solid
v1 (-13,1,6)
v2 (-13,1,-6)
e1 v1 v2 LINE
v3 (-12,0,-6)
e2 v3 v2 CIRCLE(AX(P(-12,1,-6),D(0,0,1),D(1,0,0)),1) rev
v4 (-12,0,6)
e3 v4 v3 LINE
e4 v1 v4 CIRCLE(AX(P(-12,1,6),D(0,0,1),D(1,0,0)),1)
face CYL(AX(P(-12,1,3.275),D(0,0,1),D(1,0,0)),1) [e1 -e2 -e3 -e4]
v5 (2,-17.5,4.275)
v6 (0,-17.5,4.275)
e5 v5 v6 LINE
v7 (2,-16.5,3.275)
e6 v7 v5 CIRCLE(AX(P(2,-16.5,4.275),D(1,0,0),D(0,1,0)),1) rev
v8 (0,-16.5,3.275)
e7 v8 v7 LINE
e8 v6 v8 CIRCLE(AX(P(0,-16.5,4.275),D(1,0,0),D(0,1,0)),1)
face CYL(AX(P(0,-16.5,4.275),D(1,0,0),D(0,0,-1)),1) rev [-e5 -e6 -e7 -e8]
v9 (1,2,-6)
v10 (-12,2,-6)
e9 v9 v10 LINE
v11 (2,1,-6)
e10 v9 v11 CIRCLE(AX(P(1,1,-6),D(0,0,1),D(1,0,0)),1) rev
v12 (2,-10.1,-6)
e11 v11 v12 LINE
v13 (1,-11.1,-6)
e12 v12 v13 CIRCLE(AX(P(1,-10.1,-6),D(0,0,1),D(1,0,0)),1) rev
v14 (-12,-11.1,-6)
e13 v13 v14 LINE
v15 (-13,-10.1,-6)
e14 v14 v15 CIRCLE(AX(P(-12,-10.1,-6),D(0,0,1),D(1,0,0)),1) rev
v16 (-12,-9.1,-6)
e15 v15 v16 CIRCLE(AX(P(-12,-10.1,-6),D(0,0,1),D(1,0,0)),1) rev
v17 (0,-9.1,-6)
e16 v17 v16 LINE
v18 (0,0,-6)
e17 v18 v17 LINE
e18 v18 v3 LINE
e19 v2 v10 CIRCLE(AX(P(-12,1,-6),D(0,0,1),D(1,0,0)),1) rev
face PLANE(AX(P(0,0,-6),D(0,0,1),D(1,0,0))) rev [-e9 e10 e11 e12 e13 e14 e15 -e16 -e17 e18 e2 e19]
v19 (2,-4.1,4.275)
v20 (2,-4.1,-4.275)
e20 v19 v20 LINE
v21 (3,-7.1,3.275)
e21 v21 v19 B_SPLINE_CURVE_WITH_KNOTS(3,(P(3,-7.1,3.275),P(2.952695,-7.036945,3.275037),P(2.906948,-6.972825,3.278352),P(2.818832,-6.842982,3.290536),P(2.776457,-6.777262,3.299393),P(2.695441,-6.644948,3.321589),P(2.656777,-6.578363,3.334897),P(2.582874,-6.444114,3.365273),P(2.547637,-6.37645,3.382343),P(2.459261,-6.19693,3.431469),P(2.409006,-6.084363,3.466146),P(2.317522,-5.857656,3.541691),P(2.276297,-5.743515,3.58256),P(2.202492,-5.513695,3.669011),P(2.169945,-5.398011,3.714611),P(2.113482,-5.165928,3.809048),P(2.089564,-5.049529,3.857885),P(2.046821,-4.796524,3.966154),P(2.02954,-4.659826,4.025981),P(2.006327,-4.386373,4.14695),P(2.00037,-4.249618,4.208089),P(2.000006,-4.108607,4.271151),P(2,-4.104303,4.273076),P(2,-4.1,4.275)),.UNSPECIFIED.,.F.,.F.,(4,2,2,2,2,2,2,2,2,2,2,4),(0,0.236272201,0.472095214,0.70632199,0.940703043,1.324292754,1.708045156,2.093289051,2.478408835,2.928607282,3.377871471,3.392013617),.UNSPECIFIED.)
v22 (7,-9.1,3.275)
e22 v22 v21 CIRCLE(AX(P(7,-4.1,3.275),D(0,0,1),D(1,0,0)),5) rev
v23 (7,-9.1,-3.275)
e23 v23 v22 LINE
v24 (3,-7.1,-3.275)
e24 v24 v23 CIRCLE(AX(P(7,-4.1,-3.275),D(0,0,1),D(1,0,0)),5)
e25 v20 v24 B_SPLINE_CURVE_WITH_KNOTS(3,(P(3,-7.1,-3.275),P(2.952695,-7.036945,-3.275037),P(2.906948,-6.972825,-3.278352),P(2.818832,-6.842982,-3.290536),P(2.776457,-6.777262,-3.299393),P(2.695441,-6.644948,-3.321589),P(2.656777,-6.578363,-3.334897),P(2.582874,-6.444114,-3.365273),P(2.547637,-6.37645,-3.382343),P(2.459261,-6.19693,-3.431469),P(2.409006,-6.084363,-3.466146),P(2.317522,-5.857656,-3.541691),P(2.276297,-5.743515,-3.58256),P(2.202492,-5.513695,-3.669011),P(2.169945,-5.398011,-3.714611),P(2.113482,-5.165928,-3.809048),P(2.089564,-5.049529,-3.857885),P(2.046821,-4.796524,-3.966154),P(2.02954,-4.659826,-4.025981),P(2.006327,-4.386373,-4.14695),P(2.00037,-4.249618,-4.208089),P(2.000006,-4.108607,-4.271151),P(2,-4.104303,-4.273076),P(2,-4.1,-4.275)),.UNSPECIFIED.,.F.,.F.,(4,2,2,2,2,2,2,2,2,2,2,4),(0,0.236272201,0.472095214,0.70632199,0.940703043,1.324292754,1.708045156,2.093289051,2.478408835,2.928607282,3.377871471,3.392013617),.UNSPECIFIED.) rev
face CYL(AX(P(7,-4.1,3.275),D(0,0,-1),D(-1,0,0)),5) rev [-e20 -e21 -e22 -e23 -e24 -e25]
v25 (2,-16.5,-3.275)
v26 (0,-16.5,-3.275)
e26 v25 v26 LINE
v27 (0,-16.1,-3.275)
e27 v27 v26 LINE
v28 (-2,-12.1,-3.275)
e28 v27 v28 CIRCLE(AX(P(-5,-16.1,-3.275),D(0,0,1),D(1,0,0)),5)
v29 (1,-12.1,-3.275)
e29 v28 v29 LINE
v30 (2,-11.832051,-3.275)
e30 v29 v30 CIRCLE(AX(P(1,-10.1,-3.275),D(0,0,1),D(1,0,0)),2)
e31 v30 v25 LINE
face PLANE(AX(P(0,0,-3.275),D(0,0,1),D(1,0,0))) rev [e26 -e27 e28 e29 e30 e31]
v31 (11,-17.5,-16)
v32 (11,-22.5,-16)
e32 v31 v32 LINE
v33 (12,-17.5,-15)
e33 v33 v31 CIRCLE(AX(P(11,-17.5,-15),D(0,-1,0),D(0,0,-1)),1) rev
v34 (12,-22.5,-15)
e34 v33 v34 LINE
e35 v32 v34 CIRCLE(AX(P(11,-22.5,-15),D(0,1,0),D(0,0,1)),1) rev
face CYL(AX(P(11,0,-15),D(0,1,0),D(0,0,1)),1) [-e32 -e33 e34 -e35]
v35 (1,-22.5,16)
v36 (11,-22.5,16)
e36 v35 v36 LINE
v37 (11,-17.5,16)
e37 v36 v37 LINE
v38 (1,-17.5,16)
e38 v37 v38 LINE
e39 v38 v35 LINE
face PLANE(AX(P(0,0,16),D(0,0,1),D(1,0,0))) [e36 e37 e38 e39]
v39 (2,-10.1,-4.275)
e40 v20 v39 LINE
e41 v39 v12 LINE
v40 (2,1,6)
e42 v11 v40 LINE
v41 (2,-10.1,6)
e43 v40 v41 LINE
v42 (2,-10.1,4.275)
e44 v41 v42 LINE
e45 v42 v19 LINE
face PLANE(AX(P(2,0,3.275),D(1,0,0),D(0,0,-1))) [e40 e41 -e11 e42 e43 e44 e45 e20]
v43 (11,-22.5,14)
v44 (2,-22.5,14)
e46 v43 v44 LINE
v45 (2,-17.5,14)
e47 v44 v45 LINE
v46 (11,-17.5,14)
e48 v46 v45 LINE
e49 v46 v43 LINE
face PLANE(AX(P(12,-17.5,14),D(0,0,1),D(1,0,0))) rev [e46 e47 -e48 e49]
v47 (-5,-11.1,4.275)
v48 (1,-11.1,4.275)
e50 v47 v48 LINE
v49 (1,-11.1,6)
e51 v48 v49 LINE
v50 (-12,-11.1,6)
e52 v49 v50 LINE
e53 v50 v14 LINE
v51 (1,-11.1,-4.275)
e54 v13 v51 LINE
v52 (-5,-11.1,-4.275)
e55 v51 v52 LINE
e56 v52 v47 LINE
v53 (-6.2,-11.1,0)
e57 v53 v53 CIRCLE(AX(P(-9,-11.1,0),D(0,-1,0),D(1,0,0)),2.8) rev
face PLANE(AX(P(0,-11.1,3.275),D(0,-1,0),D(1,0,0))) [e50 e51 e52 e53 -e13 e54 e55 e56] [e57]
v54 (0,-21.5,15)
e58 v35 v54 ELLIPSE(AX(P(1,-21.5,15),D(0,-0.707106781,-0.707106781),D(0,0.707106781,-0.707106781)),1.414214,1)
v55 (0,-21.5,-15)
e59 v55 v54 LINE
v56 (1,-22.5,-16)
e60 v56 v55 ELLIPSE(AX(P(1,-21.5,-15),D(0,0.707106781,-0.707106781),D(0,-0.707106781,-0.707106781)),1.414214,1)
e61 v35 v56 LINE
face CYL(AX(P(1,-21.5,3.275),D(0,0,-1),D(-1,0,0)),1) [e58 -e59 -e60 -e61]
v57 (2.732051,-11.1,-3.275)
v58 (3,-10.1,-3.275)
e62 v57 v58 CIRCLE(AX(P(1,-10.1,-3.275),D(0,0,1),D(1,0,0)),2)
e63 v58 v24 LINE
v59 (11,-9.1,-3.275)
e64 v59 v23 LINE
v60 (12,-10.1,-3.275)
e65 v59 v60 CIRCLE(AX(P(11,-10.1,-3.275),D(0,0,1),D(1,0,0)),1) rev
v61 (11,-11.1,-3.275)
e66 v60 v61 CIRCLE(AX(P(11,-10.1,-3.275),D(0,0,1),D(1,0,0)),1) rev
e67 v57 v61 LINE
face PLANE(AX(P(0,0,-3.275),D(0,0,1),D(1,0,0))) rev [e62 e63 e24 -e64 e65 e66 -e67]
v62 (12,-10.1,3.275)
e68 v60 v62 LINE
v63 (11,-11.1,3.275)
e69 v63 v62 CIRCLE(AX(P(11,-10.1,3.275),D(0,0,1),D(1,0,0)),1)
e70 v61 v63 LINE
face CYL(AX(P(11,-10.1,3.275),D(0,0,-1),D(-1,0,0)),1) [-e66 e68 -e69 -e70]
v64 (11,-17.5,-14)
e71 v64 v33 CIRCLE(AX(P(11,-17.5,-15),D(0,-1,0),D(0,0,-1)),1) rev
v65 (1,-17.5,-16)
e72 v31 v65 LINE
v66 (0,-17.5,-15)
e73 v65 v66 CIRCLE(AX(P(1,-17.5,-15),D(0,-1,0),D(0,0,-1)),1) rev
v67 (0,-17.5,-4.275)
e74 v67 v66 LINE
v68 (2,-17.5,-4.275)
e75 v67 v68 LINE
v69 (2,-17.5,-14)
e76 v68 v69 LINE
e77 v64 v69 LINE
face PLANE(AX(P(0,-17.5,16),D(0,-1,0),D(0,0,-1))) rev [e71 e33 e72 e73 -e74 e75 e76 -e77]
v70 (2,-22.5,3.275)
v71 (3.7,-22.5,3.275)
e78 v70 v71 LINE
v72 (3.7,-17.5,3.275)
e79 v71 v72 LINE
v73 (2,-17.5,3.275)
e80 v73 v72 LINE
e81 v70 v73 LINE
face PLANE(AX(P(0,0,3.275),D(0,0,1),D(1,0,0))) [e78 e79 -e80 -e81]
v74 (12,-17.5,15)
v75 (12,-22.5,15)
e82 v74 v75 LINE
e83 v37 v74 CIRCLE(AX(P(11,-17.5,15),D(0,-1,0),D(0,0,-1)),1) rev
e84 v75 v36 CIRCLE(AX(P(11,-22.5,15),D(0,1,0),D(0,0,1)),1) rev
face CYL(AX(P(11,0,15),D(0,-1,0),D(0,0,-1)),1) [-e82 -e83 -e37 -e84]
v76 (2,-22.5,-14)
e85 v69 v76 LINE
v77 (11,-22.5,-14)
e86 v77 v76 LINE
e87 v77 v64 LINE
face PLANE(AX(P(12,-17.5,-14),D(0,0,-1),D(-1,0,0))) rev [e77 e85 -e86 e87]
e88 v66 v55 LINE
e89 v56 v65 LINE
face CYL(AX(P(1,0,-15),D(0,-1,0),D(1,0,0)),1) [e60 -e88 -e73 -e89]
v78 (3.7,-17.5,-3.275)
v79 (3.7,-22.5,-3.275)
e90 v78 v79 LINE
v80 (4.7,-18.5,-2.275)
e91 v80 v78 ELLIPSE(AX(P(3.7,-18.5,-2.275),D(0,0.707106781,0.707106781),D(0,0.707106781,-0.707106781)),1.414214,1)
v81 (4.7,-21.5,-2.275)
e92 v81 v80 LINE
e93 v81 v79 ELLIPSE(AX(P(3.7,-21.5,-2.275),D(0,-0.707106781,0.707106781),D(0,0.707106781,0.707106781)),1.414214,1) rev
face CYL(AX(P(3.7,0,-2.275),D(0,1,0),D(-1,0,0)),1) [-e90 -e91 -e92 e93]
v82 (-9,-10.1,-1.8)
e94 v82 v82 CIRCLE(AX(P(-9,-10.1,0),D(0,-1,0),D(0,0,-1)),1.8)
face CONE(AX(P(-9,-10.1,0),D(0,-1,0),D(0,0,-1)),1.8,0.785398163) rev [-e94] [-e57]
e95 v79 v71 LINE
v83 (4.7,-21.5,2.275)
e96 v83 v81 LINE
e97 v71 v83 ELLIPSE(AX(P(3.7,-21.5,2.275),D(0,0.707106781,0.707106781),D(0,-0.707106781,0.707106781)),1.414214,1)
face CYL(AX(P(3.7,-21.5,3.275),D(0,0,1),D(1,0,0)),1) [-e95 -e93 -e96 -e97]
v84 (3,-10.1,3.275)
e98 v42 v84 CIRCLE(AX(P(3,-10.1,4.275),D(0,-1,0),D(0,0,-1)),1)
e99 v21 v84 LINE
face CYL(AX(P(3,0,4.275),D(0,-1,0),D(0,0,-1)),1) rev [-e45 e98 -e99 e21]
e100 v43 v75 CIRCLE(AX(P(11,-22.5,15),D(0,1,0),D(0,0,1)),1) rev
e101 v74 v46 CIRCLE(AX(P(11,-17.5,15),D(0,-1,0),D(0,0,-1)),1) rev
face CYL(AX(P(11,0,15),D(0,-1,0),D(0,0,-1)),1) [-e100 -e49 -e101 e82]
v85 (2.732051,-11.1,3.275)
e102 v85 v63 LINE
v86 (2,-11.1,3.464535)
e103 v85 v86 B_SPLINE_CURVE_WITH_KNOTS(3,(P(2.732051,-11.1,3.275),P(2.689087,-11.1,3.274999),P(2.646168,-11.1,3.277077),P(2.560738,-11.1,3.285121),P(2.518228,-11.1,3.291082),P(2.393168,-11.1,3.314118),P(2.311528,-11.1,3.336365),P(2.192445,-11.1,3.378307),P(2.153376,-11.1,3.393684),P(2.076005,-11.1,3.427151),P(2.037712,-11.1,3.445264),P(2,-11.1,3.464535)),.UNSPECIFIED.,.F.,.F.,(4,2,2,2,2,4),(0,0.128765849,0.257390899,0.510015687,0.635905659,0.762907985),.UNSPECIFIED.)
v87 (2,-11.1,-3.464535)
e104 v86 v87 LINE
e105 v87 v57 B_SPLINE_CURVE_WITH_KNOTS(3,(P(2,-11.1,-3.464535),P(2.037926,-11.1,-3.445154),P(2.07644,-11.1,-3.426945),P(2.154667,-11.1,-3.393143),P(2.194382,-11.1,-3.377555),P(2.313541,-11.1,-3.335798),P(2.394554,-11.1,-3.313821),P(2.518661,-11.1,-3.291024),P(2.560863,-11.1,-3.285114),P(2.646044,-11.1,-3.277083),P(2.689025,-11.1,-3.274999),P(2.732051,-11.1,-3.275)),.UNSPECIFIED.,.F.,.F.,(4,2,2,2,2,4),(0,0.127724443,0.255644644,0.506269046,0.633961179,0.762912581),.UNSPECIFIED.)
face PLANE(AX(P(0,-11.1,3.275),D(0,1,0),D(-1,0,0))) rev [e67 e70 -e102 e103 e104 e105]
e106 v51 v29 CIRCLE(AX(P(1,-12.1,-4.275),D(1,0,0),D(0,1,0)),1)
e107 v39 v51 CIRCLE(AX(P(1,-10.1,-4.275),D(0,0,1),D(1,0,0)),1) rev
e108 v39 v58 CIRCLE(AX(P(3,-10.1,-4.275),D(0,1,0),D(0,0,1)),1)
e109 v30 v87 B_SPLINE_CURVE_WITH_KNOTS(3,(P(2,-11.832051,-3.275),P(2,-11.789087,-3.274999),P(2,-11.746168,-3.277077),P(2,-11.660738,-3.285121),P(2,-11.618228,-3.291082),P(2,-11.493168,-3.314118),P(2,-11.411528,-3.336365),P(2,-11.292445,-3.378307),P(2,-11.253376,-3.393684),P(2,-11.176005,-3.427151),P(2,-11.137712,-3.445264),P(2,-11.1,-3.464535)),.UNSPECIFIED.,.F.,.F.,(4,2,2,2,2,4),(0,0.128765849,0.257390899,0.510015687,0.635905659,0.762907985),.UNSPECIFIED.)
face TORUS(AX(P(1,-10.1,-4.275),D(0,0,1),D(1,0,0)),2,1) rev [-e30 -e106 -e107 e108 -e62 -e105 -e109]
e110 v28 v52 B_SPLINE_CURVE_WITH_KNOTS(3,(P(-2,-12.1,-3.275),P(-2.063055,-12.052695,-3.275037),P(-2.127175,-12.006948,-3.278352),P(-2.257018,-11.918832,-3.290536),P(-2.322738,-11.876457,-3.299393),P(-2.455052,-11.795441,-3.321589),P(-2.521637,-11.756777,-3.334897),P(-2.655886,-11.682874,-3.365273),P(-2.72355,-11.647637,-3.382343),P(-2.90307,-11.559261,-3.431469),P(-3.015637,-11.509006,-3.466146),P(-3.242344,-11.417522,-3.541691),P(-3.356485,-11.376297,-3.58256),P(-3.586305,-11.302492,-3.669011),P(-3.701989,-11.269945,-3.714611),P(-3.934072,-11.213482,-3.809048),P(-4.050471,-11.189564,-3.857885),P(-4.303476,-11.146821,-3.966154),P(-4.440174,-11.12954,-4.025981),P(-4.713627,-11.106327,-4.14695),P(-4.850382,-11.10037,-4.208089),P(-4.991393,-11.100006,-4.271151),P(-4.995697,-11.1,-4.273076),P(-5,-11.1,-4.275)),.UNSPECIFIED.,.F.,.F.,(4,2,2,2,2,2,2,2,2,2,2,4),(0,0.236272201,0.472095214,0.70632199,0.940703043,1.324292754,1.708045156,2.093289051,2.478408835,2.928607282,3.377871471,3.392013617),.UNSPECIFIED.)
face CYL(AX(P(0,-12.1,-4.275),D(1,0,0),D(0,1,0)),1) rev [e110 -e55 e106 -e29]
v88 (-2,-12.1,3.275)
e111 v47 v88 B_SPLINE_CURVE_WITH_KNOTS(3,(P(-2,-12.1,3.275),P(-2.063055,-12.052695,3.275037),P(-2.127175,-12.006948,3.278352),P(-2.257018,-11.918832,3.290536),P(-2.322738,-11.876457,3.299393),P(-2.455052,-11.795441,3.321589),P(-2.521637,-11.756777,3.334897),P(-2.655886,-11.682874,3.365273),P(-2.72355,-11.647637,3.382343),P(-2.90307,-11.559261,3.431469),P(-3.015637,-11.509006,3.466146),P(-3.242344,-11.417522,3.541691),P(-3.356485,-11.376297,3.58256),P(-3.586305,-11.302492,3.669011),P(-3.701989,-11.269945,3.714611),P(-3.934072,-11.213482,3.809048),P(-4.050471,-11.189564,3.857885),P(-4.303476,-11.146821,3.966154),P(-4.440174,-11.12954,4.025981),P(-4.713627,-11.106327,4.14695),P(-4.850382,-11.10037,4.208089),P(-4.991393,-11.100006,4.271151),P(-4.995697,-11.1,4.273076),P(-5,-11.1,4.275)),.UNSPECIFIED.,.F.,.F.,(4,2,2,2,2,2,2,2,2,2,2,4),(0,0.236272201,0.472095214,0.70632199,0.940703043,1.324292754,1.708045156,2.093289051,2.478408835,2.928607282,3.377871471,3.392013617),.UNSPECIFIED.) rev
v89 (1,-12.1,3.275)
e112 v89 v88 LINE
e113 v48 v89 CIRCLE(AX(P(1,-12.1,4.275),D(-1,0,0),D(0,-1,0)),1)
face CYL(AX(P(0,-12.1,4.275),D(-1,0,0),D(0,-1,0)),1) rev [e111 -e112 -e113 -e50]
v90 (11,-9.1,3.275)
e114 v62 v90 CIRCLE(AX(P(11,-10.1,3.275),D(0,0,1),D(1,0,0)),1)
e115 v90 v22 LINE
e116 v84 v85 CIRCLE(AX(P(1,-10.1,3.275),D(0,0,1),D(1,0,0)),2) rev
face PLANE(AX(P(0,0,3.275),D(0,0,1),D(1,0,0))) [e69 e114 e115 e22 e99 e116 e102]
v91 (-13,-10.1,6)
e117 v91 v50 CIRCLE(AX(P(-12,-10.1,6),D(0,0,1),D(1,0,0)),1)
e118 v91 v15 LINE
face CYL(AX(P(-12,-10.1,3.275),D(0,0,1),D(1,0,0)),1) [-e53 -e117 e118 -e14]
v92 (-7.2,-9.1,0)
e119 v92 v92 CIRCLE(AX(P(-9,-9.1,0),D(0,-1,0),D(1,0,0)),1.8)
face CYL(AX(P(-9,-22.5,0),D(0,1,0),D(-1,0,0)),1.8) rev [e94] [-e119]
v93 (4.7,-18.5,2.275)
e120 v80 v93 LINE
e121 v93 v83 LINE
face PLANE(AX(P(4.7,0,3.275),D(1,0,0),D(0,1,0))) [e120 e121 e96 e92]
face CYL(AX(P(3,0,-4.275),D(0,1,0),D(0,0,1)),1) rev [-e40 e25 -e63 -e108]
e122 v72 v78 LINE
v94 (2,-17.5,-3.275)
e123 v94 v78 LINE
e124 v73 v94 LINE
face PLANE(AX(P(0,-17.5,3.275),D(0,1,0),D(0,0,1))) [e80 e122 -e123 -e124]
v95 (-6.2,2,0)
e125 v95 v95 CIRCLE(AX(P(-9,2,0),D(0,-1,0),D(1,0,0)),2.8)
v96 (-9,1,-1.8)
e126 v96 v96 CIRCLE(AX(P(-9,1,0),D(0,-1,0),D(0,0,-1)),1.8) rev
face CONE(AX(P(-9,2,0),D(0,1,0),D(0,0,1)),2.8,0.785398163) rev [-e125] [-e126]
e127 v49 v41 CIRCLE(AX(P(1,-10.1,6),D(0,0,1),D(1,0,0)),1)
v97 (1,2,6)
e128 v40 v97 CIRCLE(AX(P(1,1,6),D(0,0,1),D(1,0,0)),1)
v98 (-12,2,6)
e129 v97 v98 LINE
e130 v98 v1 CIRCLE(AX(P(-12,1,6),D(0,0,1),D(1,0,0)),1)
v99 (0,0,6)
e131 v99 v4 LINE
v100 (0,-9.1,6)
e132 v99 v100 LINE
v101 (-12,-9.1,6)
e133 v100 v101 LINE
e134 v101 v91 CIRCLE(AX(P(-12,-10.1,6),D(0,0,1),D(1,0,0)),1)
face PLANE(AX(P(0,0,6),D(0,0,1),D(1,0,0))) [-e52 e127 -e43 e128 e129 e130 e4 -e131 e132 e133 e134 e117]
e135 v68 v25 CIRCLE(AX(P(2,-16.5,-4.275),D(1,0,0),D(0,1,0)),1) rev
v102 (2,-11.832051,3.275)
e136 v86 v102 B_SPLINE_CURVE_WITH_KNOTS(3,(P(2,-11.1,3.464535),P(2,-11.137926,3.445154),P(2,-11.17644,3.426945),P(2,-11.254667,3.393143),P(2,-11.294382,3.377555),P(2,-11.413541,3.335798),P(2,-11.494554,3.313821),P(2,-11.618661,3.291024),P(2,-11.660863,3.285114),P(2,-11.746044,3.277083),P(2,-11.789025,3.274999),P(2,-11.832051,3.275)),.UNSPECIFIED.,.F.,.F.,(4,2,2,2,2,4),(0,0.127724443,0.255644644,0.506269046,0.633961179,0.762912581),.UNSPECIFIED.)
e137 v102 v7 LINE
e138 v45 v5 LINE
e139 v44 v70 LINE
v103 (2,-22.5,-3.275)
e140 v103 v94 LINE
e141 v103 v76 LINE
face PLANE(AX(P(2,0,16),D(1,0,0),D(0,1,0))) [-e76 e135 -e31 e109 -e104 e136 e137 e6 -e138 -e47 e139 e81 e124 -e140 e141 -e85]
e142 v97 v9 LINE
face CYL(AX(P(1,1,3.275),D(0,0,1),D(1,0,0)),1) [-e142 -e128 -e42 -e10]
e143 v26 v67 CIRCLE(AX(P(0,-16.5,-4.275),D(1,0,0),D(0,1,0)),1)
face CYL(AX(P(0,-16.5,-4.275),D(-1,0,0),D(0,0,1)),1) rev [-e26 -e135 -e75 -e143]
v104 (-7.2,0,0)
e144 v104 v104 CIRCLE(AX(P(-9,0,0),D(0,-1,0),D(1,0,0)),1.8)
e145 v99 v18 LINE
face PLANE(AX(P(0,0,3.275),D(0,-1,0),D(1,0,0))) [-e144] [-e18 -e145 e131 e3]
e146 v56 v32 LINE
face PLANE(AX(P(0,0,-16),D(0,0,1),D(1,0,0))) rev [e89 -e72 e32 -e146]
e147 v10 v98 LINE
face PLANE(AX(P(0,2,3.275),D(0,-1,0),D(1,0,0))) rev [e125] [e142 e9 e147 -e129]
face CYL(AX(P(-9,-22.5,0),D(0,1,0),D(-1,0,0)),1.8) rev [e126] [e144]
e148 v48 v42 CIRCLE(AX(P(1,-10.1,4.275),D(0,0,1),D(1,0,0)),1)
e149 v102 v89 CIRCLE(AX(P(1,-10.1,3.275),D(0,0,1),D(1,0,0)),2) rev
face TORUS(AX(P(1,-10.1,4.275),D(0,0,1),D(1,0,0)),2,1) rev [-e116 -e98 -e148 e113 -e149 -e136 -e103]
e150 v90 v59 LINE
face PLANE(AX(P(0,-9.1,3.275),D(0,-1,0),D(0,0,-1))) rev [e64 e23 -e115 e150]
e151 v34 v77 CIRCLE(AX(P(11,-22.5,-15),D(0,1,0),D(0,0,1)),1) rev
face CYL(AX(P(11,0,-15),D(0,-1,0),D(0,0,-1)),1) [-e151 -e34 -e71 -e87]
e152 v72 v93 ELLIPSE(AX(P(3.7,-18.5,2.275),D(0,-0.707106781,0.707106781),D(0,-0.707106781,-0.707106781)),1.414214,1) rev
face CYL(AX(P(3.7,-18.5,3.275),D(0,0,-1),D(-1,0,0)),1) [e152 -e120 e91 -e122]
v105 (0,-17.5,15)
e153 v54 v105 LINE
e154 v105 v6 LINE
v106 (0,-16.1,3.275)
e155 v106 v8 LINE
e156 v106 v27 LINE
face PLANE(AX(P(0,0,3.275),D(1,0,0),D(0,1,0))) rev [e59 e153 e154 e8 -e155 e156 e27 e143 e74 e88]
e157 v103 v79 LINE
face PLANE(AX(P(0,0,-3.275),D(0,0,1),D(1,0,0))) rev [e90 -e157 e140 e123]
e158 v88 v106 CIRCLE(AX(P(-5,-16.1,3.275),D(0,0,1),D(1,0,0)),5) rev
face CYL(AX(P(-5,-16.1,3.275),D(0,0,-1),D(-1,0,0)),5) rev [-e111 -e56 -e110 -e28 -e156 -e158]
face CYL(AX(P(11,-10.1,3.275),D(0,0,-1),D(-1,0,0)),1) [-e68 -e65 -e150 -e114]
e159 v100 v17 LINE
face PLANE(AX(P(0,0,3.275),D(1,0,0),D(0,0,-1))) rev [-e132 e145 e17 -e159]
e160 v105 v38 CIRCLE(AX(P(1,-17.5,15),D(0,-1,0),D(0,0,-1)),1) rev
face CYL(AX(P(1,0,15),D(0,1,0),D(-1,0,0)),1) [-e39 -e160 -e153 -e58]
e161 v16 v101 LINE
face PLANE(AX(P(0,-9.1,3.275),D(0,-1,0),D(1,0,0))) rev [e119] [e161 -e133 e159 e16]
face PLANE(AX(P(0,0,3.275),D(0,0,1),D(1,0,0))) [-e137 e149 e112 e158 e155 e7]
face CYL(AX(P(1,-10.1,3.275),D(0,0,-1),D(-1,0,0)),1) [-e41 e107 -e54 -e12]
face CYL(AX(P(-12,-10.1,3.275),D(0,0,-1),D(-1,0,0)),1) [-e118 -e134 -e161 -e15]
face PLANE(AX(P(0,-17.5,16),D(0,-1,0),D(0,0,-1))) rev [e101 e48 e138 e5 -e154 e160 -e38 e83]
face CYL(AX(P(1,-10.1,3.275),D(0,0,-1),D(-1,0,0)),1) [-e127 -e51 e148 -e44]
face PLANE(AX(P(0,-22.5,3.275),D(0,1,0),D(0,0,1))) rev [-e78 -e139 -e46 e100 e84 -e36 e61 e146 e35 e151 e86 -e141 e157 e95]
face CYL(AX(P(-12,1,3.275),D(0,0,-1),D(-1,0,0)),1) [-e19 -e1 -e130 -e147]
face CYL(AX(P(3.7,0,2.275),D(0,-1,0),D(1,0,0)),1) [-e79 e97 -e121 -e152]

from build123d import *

# Parameters (mm, degrees)
SKETCH1_W               = 10
SKETCH1_H               = 2
BOSS_EXTRUDE1_DEPTH     = 3.275
BOSS_EXTRUDE2_DEPTH     = 6
SKETCH3_W               = 2
SKETCH3_H               = 5
BOSS_EXTRUDE3_DEPTH     = 16
SKETCH4_W               = 2
SKETCH4_H               = 5
BOSS_EXTRUDE4_DEPTH     = 10
FILLET1_R               = 1
FILLET2_R               = 1
CUT_EXTRUDE1_DEPTH      = 33.01952537
CUT_EXTRUDE1_DEPTH_BACK = 33.01952537
SKETCH2_R               = 1.8
CHAMFER1_SIZE           = 1
FILLET3_R               = 5


with BuildPart() as part:
    # Sketch1 → Boss-Extrude1 (new, symmetric)
    with BuildSketch(Plane.XY):
        Polygon((0, -9.1), (-13, -9.1), (-13, -11.1), (2, -11.1), (2, 2), (-13, 2), (-13, 0), (0, 0), align=None)
        Polygon((2, -11.1), (0, -11.1), (0, -22.5), (4.7, -22.5), (4.7, -17.5), (2, -17.5), align=None)
        with Locations((7, -10.1)):
            Rectangle(SKETCH1_W, SKETCH1_H)
    extrude(amount=BOSS_EXTRUDE1_DEPTH, both=True)

    # Sketch1<3> → Boss-Extrude2 (add, symmetric)
    with BuildSketch(Plane.XY):
        Polygon((0, -9.1), (-13, -9.1), (-13, -11.1), (2, -11.1), (2, 2), (-13, 2), (-13, 0), (0, 0), align=None)
    extrude(amount=BOSS_EXTRUDE2_DEPTH, both=True)

    # Sketch3 → Boss-Extrude3 (add, symmetric)
    with BuildSketch(Plane.XY):
        with Locations((1, -20)):
            Rectangle(SKETCH3_W, SKETCH3_H)
    extrude(amount=BOSS_EXTRUDE3_DEPTH, both=True)

    # Sketch4 → Boss-Extrude4 (add)
    with BuildSketch(Plane(origin=(2, 0, 0), x_dir=(0, 0, -1), z_dir=(1, 0, 0))):
        with Locations((-15, -20)):
            Rectangle(SKETCH4_W, SKETCH4_H)
        with Locations((15, -20)):
            Rectangle(SKETCH4_W, SKETCH4_H)
    extrude(amount=BOSS_EXTRUDE4_DEPTH)

    # Fillet1
    # the kernel refuses this fillet: 1 mm, written as the material it adds along each edge
    with BuildSketch(Plane(origin=(2, -17.5, 3.275), x_dir=(0, 1, 0), z_dir=(-1, 0, 0)), Plane(origin=(2, -17.5, -3.275), x_dir=(0, 0, -1), z_dir=(-1, 0, 0))) as fillet1_piece_1:
        with BuildLine():
            CenterArc((FILLET1_R, -FILLET1_R), FILLET1_R, 90, 90)
            Line((0, -FILLET1_R), (0, 0))
            Line((0, 0), (FILLET1_R, 0))
        make_face()
    extrude(amount=2)
    # the kernel refuses this fillet: 1 mm, written as the material it takes off along each edge
    with BuildSketch(Plane(origin=(-13, -9.1, -8.5), x_dir=(1, 0, 0), z_dir=(0, 0, 1)), Plane(origin=(-13, -11.1, -8.5), x_dir=(0, 1, 0), z_dir=(0, 0, 1)), Plane(origin=(2, 2, -8.5), x_dir=(0, -1, 0), z_dir=(0, 0, 1)), Plane(origin=(-13, 2, -8.5), x_dir=(1, 0, 0), z_dir=(0, 0, 1))) as fillet1_2_piece_1:
        with BuildLine():
            CenterArc((FILLET1_R, -FILLET1_R), FILLET1_R, 90, 90)
            Line((0, -FILLET1_R), (0, 0))
            Line((0, 0), (FILLET1_R, 0))
        make_face()
    extrude(amount=17, mode=Mode.SUBTRACT)
    with BuildSketch(Plane(origin=(2, -11.1, -8.5), x_dir=(-1, 0, 0), z_dir=(0, 0, 1)), Plane(origin=(2, -11.1, 3.275), x_dir=(-1, 0, 0), z_dir=(0, 0, 1))) as fillet1_2_piece_2:
        with BuildLine():
            CenterArc((FILLET1_R, -FILLET1_R), FILLET1_R, 90, 90)
            Line((0, -FILLET1_R), (0, 0))
            Line((0, 0), (FILLET1_R, 0))
        make_face()
    extrude(amount=5.225, mode=Mode.SUBTRACT)
    with BuildSketch(Plane(origin=(12, -15, 14), x_dir=(-1, 0, 0), z_dir=(0, -1, 0)), Plane(origin=(12, -15, -14), x_dir=(0, 0, -1), z_dir=(0, -1, 0)), Plane(origin=(0, -15, -16), x_dir=(0, 0, 1), z_dir=(0, -1, 0)), Plane(origin=(12, -25, 16), x_dir=(-1, 0, 0), z_dir=(0, 1, 0))) as fillet1_2_piece_3:
        with BuildLine():
            CenterArc((FILLET1_R, -FILLET1_R), FILLET1_R, 90, 90)
            Line((0, -FILLET1_R), (0, 0))
            Line((0, 0), (FILLET1_R, 0))
        make_face()
    extrude(amount=10, mode=Mode.SUBTRACT)
    with BuildSketch(Plane(origin=(0, -22.5, -18.5), x_dir=(0, 1, 0), z_dir=(0, 0, 1))) as fillet1_2_piece_4:
        with BuildLine():
            CenterArc((FILLET1_R, -FILLET1_R), FILLET1_R, 90, 90)
            Line((0, -FILLET1_R), (0, 0))
            Line((0, 0), (FILLET1_R, 0))
        make_face()
    extrude(amount=37, mode=Mode.SUBTRACT)
    with BuildSketch(Plane(origin=(4.7, -22.5, -5.775), x_dir=(-1, 0, 0), z_dir=(0, 0, 1)), Plane(origin=(4.7, -17.5, 5.775), x_dir=(-1, 0, 0), z_dir=(0, 0, -1))) as fillet1_2_piece_5:
        with BuildLine():
            CenterArc((FILLET1_R, -FILLET1_R), FILLET1_R, 90, 90)
            Line((0, -FILLET1_R), (0, 0))
            Line((0, 0), (FILLET1_R, 0))
        make_face()
    extrude(amount=11.55, mode=Mode.SUBTRACT)
    with BuildSketch(Plane(origin=(4.7, -25, 3.275), x_dir=(0, 0, -1), z_dir=(0, 1, 0)), Plane(origin=(4.7, -25, -3.275), x_dir=(-1, 0, 0), z_dir=(0, 1, 0)), Plane(origin=(12, -25, -16), x_dir=(-1, 0, 0), z_dir=(0, 1, 0)), Plane(origin=(0, -15, 16), x_dir=(0, 0, -1), z_dir=(0, -1, 0))) as fillet1_2_piece_6:
        with BuildLine():
            CenterArc((FILLET1_R, FILLET1_R), FILLET1_R, 180, 90)
            Line((0, FILLET1_R), (0, 0))
            Line((0, 0), (FILLET1_R, 0))
        make_face()
    extrude(amount=10, mode=Mode.SUBTRACT)
    with BuildSketch(Plane(origin=(12, -11.1, -5.775), x_dir=(0, 1, 0), z_dir=(0, 0, 1)), Plane(origin=(12, -9.1, -5.775), x_dir=(-1, 0, 0), z_dir=(0, 0, 1))) as fillet1_2_piece_7:
        with BuildLine():
            CenterArc((FILLET1_R, FILLET1_R), FILLET1_R, 180, 90)
            Line((0, FILLET1_R), (0, 0))
            Line((0, 0), (FILLET1_R, 0))
        make_face()
    extrude(amount=11.55, mode=Mode.SUBTRACT)
    with BuildSketch(Plane(origin=(-13, 0, 8.5), x_dir=(0, 1, 0), z_dir=(0, 0, -1))) as fillet1_2_piece_8:
        with BuildLine():
            CenterArc((FILLET1_R, FILLET1_R), FILLET1_R, 180, 90)
            Line((0, FILLET1_R), (0, 0))
            Line((0, 0), (FILLET1_R, 0))
        make_face()
    extrude(amount=17, mode=Mode.SUBTRACT)

    # Fillet2
    # the kernel refuses this fillet: 1 mm, written as the material it adds along each edge
    with BuildSketch(Plane(origin=(1, -10.1, -3.275), x_dir=(0, -1, 0), z_dir=(-1, 0, 0))) as fillet2_piece_1_section:
        with BuildLine():
            CenterArc((1 + FILLET2_R, -FILLET2_R), FILLET2_R, 90, 90)
            Line((1, -FILLET2_R), (1, 0))
            Line((1, 0), (1 + FILLET2_R, 0))
        make_face()
    fillet2_piece_1 = revolve(axis=Axis((1, -10.1, -3.275), (0, 0, 1)), revolution_arc=90, mode=Mode.PRIVATE)
    fillet2_piece_1 = split(fillet2_piece_1, bisect_by=Plane(origin=(2, -11.34730941, -3.421981112), z_dir=(-1, 0, 0)), keep=Keep.TOP, mode=Mode.PRIVATE)
    fillet2_piece_1 = split(fillet2_piece_1, bisect_by=Plane(origin=(1.400007142, -11.1, -3.421981112), z_dir=(0, -1, 0)), keep=Keep.TOP, mode=Mode.PRIVATE)
    add(fillet2_piece_1)
    with BuildSketch(Plane(origin=(1, -10.1, -3.275), x_dir=(0, -1, 0), z_dir=(-1, 0, 0))) as fillet2_piece_2_section:
        with BuildLine():
            CenterArc((1 + FILLET2_R, -FILLET2_R), FILLET2_R, 90, 90)
            Line((1, -FILLET2_R), (1, 0))
            Line((1, 0), (1 + FILLET2_R, 0))
        make_face()
    fillet2_piece_2 = revolve(axis=Axis((1, -10.1, -3.275), (0, 0, 1)), revolution_arc=90, mode=Mode.PRIVATE)
    fillet2_piece_2 = split(fillet2_piece_2, bisect_by=Plane(origin=(2, -10.826426326, -3.613950845), z_dir=(-1, 0, 0)), keep=Keep.TOP, mode=Mode.PRIVATE)
    fillet2_piece_2 = split(fillet2_piece_2, bisect_by=Plane(origin=(1.726426326, -11.1, -3.613950845), z_dir=(0, 1, 0)), keep=Keep.TOP, mode=Mode.PRIVATE)
    add(fillet2_piece_2)
    with BuildSketch(Plane(origin=(1, -10.1, -3.275), x_dir=(0, -1, 0), z_dir=(-1, 0, 0))) as fillet2_piece_3_section:
        with BuildLine():
            CenterArc((1 + FILLET2_R, -FILLET2_R), FILLET2_R, 90, 90)
            Line((1, -FILLET2_R), (1, 0))
            Line((1, 0), (1 + FILLET2_R, 0))
        make_face()
    fillet2_piece_3 = revolve(axis=Axis((1, -10.1, -3.275), (0, 0, 1)), revolution_arc=90, mode=Mode.PRIVATE)
    fillet2_piece_3 = split(fillet2_piece_3, bisect_by=Plane(origin=(2, -10.500007075, -3.421981186), z_dir=(1, 0, 0)), keep=Keep.TOP, mode=Mode.PRIVATE)
    fillet2_piece_3 = split(fillet2_piece_3, bisect_by=Plane(origin=(2.24730905, -11.1, -3.421981186), z_dir=(0, 1, 0)), keep=Keep.TOP, mode=Mode.PRIVATE)
    add(fillet2_piece_3)
    with BuildSketch(Plane(origin=(1, -10.1, 3.275), x_dir=(0, -1, 0), z_dir=(-1, 0, 0))) as fillet2_piece_4_section:
        with BuildLine():
            CenterArc((1 + FILLET2_R, FILLET2_R), FILLET2_R, 180, 90)
            Line((1, FILLET2_R), (1, 0))
            Line((1, 0), (1 + FILLET2_R, 0))
        make_face()
    fillet2_piece_4 = revolve(axis=Axis((1, -10.1, 3.275), (0, 0, 1)), revolution_arc=90, mode=Mode.PRIVATE)
    fillet2_piece_4 = split(fillet2_piece_4, bisect_by=Plane(origin=(2, -11.34730941, 3.421981112), z_dir=(-1, 0, 0)), keep=Keep.TOP, mode=Mode.PRIVATE)
    fillet2_piece_4 = split(fillet2_piece_4, bisect_by=Plane(origin=(1.400007142, -11.1, 3.421981112), z_dir=(0, -1, 0)), keep=Keep.TOP, mode=Mode.PRIVATE)
    add(fillet2_piece_4)
    with BuildSketch(Plane(origin=(1, -10.1, 3.275), x_dir=(0, -1, 0), z_dir=(-1, 0, 0))) as fillet2_piece_5_section:
        with BuildLine():
            CenterArc((1 + FILLET2_R, FILLET2_R), FILLET2_R, 180, 90)
            Line((1, FILLET2_R), (1, 0))
            Line((1, 0), (1 + FILLET2_R, 0))
        make_face()
    fillet2_piece_5 = revolve(axis=Axis((1, -10.1, 3.275), (0, 0, 1)), revolution_arc=90, mode=Mode.PRIVATE)
    fillet2_piece_5 = split(fillet2_piece_5, bisect_by=Plane(origin=(2, -10.826426326, 3.613950845), z_dir=(-1, 0, 0)), keep=Keep.TOP, mode=Mode.PRIVATE)
    fillet2_piece_5 = split(fillet2_piece_5, bisect_by=Plane(origin=(1.726426326, -11.1, 3.613950845), z_dir=(0, 1, 0)), keep=Keep.TOP, mode=Mode.PRIVATE)
    add(fillet2_piece_5)
    with BuildSketch(Plane(origin=(1, -10.1, 3.275), x_dir=(0, -1, 0), z_dir=(-1, 0, 0))) as fillet2_piece_6_section:
        with BuildLine():
            CenterArc((1 + FILLET2_R, FILLET2_R), FILLET2_R, 180, 90)
            Line((1, FILLET2_R), (1, 0))
            Line((1, 0), (1 + FILLET2_R, 0))
        make_face()
    fillet2_piece_6 = revolve(axis=Axis((1, -10.1, 3.275), (0, 0, 1)), revolution_arc=90, mode=Mode.PRIVATE)
    fillet2_piece_6 = split(fillet2_piece_6, bisect_by=Plane(origin=(2, -10.500007075, 3.421981186), z_dir=(1, 0, 0)), keep=Keep.TOP, mode=Mode.PRIVATE)
    fillet2_piece_6 = split(fillet2_piece_6, bisect_by=Plane(origin=(2.24730905, -11.1, 3.421981186), z_dir=(0, 1, 0)), keep=Keep.TOP, mode=Mode.PRIVATE)
    add(fillet2_piece_6)
    with BuildSketch(Plane(origin=(0, -11.1, 3.275), x_dir=(0, -1, 0), z_dir=(1, 0, 0)), Plane(origin=(2, -10.1, 3.275), x_dir=(1, 0, 0), z_dir=(0, 1, 0)), Plane(origin=(0, -11.1, -3.275), x_dir=(0, 0, -1), z_dir=(1, 0, 0)), Plane(origin=(2, -10.1, -3.275), x_dir=(0, 0, -1), z_dir=(0, 1, 0))) as fillet2_piece_7:
        with BuildLine():
            CenterArc((FILLET2_R, -FILLET2_R), FILLET2_R, 90, 90)
            Line((0, -FILLET2_R), (0, 0))
            Line((0, 0), (FILLET2_R, 0))
        make_face()
    extrude(amount=1)

    # Sketch2 → Cut-Extrude1 (cut, two sides: drawn at the far end of the back side and taken through both)
    with BuildSketch(Plane(origin=(0, 2, 0), x_dir=(1, 0, 0), z_dir=(0, 1, 0)).offset(-CUT_EXTRUDE1_DEPTH_BACK)):
        with Locations((-9, 0)):
            Circle(SKETCH2_R)
    extrude(amount=CUT_EXTRUDE1_DEPTH + CUT_EXTRUDE1_DEPTH_BACK, mode=Mode.SUBTRACT)

    # Chamfer1
    chamfer1_edges = [part.edges().sort_by_distance(p)[0] for p in [
        (-10.8, -11.1, 0),
        (-10.8, 2, 0),
    ]]
    chamfer(chamfer1_edges, length=CHAMFER1_SIZE)

    # Fillet3
    fillet3_edges = [part.edges().sort_by_distance(p)[0] for p in [
        (0, -11.1, 0),
        (2, -9.1, 0),
    ]]
    fillet(fillet3_edges, radius=FILLET3_R)


solid = part.part
